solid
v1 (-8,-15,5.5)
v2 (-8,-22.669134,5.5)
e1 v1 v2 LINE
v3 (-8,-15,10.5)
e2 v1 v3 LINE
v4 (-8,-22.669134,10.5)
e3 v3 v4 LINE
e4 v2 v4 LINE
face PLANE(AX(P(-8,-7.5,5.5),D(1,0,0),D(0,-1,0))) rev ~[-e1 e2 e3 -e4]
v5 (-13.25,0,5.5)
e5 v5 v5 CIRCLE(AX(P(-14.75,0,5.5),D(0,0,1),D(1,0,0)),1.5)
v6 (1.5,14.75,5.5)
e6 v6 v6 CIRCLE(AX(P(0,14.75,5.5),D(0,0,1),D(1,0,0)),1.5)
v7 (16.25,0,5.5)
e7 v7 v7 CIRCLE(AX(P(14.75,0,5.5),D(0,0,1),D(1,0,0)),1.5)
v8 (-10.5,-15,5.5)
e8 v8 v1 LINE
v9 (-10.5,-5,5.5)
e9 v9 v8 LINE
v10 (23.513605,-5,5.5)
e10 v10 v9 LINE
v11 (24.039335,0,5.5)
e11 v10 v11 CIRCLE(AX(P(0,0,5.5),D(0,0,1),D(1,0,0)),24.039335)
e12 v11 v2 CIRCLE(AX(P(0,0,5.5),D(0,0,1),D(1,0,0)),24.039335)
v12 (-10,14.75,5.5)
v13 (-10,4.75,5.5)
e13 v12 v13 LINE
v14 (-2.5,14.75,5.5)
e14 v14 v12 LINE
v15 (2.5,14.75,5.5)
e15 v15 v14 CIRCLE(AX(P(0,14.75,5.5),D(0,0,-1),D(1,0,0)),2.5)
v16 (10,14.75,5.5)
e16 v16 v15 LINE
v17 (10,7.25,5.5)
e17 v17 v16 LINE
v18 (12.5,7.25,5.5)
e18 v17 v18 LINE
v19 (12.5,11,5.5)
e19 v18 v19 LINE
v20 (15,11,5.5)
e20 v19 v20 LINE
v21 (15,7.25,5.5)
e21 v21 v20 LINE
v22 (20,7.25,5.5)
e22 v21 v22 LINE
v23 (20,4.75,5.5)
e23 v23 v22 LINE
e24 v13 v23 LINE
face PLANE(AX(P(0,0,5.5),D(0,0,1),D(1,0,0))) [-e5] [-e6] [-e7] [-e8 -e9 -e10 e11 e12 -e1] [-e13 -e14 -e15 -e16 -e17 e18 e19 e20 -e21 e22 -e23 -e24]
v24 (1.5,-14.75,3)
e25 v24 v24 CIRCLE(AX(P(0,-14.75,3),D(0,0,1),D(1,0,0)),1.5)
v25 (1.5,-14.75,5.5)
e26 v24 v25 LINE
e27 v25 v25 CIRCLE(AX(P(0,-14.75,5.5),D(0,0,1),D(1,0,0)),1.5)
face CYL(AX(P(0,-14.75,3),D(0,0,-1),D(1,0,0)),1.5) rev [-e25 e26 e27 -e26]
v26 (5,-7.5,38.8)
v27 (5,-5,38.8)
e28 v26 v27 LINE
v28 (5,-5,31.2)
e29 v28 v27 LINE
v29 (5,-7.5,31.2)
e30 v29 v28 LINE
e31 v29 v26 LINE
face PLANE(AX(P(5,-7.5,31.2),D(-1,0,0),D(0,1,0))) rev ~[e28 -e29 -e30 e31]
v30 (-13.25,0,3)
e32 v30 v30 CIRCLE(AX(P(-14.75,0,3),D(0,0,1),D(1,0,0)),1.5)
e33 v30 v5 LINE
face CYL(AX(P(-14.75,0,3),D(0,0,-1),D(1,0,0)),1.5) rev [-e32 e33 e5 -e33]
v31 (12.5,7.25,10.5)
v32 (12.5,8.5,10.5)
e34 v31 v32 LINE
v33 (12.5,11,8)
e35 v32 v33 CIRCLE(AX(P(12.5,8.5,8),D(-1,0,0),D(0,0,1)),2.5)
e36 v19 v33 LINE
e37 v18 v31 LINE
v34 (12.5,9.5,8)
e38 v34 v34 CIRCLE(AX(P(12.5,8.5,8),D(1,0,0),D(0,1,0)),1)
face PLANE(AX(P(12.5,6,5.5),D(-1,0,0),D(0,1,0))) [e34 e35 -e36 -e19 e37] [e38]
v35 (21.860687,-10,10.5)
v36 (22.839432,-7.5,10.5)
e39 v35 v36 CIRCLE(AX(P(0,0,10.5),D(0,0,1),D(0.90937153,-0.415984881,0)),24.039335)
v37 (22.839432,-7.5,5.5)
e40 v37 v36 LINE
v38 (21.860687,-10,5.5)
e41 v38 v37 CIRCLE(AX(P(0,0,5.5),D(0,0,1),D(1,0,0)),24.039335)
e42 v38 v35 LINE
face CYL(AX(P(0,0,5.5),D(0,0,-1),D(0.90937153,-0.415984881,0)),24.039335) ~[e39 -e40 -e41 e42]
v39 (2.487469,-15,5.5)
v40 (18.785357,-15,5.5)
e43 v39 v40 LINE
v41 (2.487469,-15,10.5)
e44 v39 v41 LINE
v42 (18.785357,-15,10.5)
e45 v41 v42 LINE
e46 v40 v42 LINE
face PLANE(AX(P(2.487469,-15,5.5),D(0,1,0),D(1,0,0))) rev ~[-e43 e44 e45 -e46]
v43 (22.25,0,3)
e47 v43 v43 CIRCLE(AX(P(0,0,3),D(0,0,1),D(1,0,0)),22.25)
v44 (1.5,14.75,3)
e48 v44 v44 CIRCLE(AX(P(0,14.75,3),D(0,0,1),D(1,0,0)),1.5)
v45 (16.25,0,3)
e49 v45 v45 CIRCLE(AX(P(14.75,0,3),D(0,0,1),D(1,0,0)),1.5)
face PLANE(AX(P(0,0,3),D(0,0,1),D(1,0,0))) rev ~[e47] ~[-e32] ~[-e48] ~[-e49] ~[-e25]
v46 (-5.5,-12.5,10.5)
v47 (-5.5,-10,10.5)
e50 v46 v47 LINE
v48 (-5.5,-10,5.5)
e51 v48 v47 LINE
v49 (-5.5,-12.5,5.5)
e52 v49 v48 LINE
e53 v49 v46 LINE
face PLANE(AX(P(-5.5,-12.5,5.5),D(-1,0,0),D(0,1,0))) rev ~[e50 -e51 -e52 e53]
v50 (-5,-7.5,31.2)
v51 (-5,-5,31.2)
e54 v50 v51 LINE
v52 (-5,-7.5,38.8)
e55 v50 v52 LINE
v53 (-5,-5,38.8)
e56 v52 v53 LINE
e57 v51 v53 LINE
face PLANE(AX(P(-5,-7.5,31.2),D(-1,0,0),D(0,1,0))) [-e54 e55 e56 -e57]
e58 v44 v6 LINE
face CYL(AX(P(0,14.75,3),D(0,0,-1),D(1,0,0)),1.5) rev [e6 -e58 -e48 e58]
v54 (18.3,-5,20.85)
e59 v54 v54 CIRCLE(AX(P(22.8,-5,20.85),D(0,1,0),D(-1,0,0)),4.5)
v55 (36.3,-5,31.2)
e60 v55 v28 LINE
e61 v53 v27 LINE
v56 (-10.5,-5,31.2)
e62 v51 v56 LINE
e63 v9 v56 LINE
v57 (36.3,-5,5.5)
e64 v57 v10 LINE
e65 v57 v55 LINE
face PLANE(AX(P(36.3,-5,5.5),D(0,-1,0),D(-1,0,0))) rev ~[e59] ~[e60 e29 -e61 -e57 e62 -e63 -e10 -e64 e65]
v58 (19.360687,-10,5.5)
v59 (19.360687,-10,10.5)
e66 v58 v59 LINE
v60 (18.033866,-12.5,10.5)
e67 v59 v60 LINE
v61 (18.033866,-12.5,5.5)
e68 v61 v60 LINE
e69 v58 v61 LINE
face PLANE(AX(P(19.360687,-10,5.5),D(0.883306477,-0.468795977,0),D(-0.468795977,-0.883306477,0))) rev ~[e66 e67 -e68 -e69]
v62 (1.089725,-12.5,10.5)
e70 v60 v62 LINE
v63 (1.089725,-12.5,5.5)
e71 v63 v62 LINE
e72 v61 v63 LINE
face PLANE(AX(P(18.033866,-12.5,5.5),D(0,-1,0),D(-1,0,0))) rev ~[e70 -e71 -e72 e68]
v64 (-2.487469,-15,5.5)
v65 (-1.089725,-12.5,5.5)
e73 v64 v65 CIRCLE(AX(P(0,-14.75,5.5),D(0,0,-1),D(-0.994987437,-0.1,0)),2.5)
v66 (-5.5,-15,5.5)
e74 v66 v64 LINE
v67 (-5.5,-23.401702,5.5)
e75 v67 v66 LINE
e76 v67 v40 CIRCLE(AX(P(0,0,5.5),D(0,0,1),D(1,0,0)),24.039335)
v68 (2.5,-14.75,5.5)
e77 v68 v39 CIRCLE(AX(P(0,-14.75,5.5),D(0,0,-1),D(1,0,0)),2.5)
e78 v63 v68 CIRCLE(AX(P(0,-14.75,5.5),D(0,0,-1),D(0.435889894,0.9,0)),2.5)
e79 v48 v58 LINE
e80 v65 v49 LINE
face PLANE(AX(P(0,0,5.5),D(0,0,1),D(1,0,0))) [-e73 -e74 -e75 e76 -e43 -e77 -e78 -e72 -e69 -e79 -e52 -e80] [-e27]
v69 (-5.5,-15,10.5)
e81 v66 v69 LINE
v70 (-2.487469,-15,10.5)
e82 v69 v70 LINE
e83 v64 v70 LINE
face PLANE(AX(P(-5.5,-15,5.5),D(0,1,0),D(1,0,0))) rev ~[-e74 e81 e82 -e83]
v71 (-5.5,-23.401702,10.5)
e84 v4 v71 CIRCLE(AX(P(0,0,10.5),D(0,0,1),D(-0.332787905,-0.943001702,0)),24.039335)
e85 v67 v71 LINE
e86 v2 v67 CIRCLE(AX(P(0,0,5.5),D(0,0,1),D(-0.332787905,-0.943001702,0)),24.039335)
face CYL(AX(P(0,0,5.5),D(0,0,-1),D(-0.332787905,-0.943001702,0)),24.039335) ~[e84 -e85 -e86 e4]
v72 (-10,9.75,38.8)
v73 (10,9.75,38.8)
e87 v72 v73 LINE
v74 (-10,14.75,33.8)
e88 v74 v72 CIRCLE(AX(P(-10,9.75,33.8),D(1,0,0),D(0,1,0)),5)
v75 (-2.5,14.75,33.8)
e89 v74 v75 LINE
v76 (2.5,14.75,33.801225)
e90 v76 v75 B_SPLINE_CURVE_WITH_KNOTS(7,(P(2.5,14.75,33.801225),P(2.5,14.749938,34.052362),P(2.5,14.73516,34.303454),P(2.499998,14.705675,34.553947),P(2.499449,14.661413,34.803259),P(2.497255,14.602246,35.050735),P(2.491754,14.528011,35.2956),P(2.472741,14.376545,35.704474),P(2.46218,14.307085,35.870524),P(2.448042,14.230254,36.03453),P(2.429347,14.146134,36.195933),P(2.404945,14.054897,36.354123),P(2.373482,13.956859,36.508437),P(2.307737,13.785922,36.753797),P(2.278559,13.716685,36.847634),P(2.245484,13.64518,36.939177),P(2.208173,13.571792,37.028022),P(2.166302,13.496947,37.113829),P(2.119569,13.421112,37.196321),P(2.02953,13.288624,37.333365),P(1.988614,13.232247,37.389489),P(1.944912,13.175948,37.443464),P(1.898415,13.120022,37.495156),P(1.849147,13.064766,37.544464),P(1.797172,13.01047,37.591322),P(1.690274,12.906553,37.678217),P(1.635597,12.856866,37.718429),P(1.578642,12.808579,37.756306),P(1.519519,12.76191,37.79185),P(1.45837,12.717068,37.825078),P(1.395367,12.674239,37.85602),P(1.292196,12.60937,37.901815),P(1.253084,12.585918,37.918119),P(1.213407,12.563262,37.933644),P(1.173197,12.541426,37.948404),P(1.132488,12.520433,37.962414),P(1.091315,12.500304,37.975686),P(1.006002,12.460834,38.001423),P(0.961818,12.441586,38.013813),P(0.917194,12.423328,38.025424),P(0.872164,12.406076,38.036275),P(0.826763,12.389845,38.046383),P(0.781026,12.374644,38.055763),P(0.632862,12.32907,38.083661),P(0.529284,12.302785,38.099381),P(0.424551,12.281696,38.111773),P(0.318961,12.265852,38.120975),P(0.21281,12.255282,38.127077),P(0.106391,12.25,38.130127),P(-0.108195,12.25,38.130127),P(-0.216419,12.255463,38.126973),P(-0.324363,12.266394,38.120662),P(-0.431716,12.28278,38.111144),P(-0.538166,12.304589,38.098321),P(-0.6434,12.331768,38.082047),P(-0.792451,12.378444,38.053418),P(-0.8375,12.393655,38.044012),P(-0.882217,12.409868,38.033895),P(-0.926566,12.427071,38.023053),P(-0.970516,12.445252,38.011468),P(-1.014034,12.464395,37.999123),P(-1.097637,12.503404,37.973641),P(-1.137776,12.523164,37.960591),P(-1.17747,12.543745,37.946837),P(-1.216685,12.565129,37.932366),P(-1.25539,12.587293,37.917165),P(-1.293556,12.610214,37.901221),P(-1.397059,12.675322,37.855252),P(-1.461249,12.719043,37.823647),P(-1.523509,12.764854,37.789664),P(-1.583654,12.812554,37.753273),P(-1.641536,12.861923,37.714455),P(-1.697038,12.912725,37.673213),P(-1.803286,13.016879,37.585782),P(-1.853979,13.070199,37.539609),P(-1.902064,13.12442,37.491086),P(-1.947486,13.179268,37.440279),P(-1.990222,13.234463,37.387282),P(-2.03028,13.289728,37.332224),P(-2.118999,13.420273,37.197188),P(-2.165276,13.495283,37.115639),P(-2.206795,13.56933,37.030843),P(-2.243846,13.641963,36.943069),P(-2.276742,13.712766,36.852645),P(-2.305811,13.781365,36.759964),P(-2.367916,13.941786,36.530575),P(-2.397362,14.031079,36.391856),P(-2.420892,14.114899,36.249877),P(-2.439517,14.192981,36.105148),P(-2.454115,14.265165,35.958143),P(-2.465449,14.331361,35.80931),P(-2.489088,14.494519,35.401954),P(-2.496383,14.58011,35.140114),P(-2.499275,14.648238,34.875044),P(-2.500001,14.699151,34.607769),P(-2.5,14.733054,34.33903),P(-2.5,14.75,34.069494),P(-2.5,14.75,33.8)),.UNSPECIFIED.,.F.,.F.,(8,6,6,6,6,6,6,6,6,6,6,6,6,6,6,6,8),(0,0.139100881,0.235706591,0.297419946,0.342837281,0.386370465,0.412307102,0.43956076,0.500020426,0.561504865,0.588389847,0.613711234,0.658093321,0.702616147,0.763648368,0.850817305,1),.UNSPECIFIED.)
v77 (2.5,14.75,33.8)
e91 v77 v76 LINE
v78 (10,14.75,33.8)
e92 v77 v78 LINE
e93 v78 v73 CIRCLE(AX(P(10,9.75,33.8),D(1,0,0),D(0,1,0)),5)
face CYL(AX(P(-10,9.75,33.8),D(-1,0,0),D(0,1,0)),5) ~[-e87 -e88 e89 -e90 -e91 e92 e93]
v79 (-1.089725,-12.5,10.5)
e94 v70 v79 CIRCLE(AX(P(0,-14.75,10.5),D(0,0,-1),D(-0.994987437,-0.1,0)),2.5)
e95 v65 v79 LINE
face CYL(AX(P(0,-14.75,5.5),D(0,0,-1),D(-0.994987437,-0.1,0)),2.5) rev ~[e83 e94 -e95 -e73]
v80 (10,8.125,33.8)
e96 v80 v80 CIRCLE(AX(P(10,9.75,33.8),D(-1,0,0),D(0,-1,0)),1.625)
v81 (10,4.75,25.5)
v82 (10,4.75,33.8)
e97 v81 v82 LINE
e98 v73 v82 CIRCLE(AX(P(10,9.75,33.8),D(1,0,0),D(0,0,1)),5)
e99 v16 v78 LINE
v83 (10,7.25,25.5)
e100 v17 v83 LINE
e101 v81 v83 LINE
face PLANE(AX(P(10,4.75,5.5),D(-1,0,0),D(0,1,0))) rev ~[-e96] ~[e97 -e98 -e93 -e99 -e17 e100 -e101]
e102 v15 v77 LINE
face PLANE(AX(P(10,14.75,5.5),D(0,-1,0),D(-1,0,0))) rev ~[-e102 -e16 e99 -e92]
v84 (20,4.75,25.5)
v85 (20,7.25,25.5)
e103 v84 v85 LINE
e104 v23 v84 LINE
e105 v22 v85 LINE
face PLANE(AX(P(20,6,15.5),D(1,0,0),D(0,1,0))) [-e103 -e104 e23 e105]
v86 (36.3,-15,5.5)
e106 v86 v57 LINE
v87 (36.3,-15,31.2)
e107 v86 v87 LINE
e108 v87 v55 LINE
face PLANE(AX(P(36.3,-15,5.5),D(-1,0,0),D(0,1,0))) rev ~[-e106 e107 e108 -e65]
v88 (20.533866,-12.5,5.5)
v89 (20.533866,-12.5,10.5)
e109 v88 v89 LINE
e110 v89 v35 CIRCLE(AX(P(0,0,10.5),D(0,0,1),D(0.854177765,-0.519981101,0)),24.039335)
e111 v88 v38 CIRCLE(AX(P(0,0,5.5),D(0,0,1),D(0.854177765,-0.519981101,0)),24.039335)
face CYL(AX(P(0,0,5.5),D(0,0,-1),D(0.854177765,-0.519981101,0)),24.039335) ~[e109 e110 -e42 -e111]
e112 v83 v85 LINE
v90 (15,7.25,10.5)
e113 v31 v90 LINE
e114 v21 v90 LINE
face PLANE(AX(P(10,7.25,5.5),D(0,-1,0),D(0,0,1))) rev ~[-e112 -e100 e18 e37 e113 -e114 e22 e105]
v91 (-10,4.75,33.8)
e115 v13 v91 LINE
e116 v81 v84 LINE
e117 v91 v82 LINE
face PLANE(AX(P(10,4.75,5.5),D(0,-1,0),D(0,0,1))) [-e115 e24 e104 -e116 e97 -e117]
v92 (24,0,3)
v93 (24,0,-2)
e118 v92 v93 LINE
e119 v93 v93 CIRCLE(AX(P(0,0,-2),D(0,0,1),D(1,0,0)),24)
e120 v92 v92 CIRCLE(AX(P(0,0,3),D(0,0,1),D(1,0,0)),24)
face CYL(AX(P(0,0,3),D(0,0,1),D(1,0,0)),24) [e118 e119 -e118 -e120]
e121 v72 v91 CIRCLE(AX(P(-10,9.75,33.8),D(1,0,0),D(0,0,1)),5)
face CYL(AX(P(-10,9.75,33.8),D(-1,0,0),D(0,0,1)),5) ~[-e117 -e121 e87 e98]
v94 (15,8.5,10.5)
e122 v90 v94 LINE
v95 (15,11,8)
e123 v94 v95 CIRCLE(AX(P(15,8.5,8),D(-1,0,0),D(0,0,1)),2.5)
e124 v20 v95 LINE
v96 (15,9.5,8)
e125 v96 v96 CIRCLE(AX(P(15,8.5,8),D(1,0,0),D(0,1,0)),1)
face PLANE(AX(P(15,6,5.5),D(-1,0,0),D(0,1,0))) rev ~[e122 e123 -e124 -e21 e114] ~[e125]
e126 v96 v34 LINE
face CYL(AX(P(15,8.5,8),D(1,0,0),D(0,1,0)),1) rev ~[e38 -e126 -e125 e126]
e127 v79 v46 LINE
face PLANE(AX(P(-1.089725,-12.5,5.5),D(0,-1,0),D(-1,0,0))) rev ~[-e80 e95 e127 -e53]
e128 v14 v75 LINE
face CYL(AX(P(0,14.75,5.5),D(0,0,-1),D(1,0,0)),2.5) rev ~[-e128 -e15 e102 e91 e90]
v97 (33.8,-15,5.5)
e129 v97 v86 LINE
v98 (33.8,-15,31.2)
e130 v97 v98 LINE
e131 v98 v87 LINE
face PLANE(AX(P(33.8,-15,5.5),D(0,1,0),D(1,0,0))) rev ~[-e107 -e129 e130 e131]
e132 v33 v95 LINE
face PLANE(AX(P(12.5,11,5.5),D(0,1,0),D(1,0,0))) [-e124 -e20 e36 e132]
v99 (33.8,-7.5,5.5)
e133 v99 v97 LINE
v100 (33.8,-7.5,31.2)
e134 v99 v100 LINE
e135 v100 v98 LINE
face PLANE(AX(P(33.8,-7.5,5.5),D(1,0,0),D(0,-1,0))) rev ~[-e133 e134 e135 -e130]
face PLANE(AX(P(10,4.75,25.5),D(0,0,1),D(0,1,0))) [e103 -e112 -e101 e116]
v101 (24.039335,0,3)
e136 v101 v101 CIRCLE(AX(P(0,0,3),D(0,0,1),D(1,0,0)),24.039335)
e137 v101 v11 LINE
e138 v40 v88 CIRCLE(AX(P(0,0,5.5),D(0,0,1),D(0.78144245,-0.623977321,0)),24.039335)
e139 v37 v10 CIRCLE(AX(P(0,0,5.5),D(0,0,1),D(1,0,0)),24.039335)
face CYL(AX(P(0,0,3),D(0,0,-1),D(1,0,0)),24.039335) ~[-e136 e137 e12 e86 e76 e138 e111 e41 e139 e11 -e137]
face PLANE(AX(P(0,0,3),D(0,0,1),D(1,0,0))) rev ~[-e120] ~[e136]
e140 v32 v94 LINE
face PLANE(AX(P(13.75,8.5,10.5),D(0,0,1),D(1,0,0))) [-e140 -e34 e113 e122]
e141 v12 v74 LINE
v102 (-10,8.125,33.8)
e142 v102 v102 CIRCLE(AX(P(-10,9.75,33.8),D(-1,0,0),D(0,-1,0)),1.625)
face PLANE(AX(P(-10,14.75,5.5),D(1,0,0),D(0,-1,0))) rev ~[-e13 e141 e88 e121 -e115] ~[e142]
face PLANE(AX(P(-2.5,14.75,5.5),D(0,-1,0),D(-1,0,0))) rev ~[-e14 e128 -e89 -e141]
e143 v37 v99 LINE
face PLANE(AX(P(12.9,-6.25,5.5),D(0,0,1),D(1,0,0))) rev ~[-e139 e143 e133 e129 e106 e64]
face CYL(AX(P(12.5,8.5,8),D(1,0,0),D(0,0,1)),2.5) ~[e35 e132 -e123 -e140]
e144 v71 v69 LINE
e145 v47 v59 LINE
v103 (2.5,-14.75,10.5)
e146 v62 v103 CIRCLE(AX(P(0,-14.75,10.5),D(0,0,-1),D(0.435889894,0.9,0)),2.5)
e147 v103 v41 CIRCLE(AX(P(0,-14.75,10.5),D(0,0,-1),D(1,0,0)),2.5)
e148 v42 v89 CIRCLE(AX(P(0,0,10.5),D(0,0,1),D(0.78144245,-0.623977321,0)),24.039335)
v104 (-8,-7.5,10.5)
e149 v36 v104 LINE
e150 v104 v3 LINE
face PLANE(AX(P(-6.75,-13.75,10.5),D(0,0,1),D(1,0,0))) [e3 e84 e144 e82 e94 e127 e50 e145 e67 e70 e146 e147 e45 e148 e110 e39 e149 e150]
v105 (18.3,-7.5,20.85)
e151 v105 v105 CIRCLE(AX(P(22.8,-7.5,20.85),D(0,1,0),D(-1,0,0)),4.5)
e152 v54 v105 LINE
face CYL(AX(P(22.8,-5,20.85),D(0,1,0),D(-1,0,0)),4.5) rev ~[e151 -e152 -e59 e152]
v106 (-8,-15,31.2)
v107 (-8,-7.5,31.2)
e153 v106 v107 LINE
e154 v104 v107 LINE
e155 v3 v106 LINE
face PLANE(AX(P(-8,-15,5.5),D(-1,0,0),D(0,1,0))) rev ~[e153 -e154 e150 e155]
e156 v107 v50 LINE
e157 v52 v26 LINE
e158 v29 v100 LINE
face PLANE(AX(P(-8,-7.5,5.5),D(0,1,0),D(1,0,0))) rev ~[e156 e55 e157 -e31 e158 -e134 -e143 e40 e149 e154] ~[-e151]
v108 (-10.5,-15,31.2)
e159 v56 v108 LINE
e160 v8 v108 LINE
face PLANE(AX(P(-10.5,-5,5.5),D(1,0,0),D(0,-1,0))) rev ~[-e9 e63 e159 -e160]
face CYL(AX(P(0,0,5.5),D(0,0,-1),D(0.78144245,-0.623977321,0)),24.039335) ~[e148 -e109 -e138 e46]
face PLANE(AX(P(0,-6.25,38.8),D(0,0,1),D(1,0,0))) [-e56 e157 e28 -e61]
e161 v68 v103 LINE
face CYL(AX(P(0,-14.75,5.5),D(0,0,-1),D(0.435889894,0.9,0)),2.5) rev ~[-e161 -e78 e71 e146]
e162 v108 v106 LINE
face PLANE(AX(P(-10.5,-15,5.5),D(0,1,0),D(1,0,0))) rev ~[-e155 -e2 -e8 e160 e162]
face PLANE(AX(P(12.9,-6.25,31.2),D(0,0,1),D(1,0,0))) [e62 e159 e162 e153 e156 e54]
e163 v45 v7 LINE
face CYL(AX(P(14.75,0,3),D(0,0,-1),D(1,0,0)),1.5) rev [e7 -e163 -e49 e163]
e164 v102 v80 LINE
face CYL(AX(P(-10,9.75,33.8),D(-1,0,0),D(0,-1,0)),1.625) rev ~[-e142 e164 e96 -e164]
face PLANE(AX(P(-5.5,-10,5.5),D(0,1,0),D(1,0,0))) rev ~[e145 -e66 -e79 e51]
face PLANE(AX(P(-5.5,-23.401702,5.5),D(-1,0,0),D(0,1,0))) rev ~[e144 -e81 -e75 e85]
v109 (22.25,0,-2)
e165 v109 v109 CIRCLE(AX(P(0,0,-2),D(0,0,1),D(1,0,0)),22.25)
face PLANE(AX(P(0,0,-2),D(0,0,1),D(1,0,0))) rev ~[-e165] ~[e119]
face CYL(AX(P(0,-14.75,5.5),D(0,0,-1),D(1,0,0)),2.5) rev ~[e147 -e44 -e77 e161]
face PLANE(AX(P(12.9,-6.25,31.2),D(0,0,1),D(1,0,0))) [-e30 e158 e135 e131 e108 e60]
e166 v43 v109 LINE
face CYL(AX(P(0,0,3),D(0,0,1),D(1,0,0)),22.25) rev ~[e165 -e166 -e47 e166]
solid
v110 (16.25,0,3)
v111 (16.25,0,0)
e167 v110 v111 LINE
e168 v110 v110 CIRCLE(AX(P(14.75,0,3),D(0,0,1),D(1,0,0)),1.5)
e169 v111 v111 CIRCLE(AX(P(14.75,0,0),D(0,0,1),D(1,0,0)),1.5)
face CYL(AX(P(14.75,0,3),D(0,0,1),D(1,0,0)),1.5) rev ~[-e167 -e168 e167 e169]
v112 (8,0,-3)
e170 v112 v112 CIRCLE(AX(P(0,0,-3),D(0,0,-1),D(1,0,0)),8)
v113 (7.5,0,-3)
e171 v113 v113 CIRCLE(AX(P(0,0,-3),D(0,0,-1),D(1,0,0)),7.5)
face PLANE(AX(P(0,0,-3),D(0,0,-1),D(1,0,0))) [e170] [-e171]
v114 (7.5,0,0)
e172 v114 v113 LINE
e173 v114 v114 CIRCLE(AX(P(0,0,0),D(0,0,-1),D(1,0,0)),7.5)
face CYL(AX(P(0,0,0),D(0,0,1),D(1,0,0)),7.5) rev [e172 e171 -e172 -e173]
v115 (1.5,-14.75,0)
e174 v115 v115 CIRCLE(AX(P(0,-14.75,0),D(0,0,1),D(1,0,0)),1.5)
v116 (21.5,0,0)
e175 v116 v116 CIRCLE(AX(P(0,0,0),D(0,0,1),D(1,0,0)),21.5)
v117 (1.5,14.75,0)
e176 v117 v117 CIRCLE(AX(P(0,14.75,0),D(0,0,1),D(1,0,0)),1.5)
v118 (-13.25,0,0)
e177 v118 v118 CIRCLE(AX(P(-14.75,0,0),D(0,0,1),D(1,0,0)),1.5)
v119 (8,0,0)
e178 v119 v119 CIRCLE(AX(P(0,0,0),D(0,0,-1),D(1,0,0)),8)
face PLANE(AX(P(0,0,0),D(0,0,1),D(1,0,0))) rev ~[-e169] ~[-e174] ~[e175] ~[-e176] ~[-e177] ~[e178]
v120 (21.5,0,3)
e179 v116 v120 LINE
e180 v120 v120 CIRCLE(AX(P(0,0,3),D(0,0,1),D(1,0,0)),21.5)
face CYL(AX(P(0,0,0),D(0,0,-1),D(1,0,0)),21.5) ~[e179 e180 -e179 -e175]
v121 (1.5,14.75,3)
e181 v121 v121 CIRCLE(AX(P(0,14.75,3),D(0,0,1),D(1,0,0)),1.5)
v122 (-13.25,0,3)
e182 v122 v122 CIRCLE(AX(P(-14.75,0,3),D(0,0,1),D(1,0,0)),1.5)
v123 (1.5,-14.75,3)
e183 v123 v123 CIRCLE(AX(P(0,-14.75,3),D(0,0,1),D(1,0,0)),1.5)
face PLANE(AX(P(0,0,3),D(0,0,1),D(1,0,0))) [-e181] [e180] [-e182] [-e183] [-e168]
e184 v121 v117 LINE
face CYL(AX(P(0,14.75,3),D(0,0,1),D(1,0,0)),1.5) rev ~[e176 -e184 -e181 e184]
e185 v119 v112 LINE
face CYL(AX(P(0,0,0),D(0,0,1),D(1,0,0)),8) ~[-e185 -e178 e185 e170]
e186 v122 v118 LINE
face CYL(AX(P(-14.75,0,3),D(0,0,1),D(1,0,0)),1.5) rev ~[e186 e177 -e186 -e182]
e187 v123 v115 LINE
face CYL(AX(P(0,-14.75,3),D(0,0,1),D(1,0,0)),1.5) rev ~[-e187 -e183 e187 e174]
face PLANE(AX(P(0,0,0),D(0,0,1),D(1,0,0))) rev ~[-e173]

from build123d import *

# Parameters (mm, degrees)
F0_R      = 21.5
F1_DEPTH  = 3
F2_R      = 1.5
F3_DEPTH  = 3
F4_R      = 24
F4_R_2    = 22.25
F5_DEPTH  = 5
F7_R      = 8
F7_R_2    = 7.5
F8_DEPTH  = 3
F6_R      = 24.0393352326
F6_R_2    = 1.5
F9_DEPTH  = 2.5
F10_W     = 41.8
F10_H     = 2.5
F11_DEPTH = 25.7
F12_R     = 4.5
F13_DEPTH = 2.5
F14_W     = 2.5
F14_H     = 2.5
F15_DEPTH = 5
F17_DEPTH = 33.3
F18_R     = 1.625
F19_DEPTH = 20
F20_W     = 10
F20_H     = 2.5
F21_DEPTH = 7.6
F22_W     = 2.5
F22_H     = 5
F23_DEPTH = 5
F24_R     = 1
F25_DEPTH = 2.5
F26_W     = 2.5
F26_H     = 20
F27_DEPTH = 10
F28_R     = 2.5


with BuildPart() as f1:
    # F0 (on Top) → F1 (new body)
    with BuildSketch(Plane.XY):
        Circle(F0_R)
    extrude(amount=F1_DEPTH)

    # F2 (on face) → F3 (cut, through all)
    with BuildSketch(Plane.XY.offset(3)):
        with Locations((0, 14.75)):
            Circle(F2_R)
        with Locations((-14.75, 0)):
            Circle(F2_R)
        with Locations((14.75, 0)):
            Circle(F2_R)
        with Locations((0, -14.75)):
            Circle(F2_R)
    extrude(amount=-F3_DEPTH, mode=Mode.SUBTRACT)

    # F7 (on face) → F8 (join)
    with BuildSketch(Plane(origin=(0, 0, 0), x_dir=(1, 0, 0), z_dir=(0, 0, -1))):
        Circle(F7_R)
        Circle(F7_R_2, mode=Mode.SUBTRACT)
    extrude(amount=F8_DEPTH)


with BuildPart() as f5:
    # F4 (on face) → F5 (new body)
    with BuildSketch(Plane.XY.offset(3)):
        Circle(F4_R)
        Circle(F4_R_2, mode=Mode.SUBTRACT)
    extrude(amount=-F5_DEPTH)

    # F6 (on face) → F9 (join)
    with BuildSketch(Plane.XY.offset(3)):
        Circle(F6_R)
        with Locations((0, -14.75)):
            Circle(F6_R_2, mode=Mode.SUBTRACT)
        with Locations((-14.75, 0)):
            Circle(F6_R_2, mode=Mode.SUBTRACT)
        with Locations((14.75, 0)):
            Circle(F6_R_2, mode=Mode.SUBTRACT)
        with Locations((0, 14.75)):
            Circle(F6_R_2, mode=Mode.SUBTRACT)
    extrude(amount=F9_DEPTH)

    # F10 (on face) → F11 (join)
    with BuildSketch(Plane.XY.offset(5.5)):
        with Locations((12.9, -6.25)):
            Rectangle(F10_W, F10_H)
        Polygon((-8, -7.5), (-8, -5), (-10.5, -5), (-10.5, -15), (-8, -15), align=None)
        Polygon((36.3, -5), (33.8, -5), (33.8, -7.5), (33.8, -15), (36.3, -15), align=None)
    extrude(amount=F11_DEPTH)

    # F12 (on face) → F13 (cut, through all)
    with BuildSketch(Plane(origin=(0, -5, 0), x_dir=(-1, 0, 0), z_dir=(0, 1, 0))):
        with Locations((-22.8, 20.85)):
            Circle(F12_R)
    extrude(amount=-F13_DEPTH, mode=Mode.SUBTRACT)

    # F14 (on face) → F15 (join)
    with BuildSketch(Plane.XY.offset(5.5)):
        with Locations((-6.75, -13.75)):
            Rectangle(F14_W, F14_H)
        Polygon((-8, -7.5), (-8, -12.5), (-5.5, -12.5), (-5.5, -10), (-5.5, -7.5), align=None)
        with BuildLine():
            Line((-5.5, -7.5), (-5.5, -10))
            Line((-5.5, -10), (19.3606870529, -10))
            Line((19.3606870529, -10), (21.8606870529, -10))
            ThreePointArc((21.8606870529, -10), (22.3849872275, -8.7636741867), (22.8394316573, -7.5))
            Line((22.8394316573, -7.5), (-5.5, -7.5))
        make_face()
        with BuildLine():
            Line((21.8606870529, -10), (19.3606870529, -10))
            Line((19.3606870529, -10), (18.0338656474, -12.5))
            Line((18.0338656474, -12.5), (20.5338656474, -12.5))
            ThreePointArc((20.5338656474, -12.5), (21.2341005146, -11.2695436359), (21.8606870529, -10))
        make_face()
        with BuildLine():
            ThreePointArc((2.5, -14.75), (2.4968651828, -14.8751569376), (2.4874685928, -15))
            Line((2.4874685928, -15), (18.7853570215, -15))
            ThreePointArc((18.7853570215, -15), (19.699310085, -13.7777654431), (20.5338656474, -12.5))
            Line((20.5338656474, -12.5), (18.0338656474, -12.5))
            Line((18.0338656474, -12.5), (1.0897247359, -12.5))
            ThreePointArc((1.0897247359, -12.5), (2.1182908015, -13.4222786135), (2.5, -14.75))
        make_face()
        with BuildLine():
            Line((-5.5, -15), (-8, -15))
            Line((-8, -15), (-8, -22.6691340467))
            ThreePointArc((-8, -22.6691340467), (-6.7599307548, -23.0693080654), (-5.5, -23.4017016139))
            Line((-5.5, -23.4017016139), (-5.5, -15))
        make_face()
        with BuildLine():
            Line((-5.5, -12.5), (-5.5, -15))
            Line((-5.5, -15), (-2.4874685928, -15))
            ThreePointArc((-2.4874685928, -15), (-2.1821040369, -13.529990995), (-1.0897247359, -12.5))
            Line((-1.0897247359, -12.5), (-5.5, -12.5))
        make_face()
    extrude(amount=F15_DEPTH)

    # F16 (on face) → F17 (join)
    with BuildSketch(Plane.XY.offset(5.5)):
        with BuildLine():
            Line((-10, 14.75), (-10, 4.75))
            Line((-10, 4.75), (10, 4.75))
            Line((10, 4.75), (10, 14.75))
            Line((10, 14.75), (2.5, 14.75))
            ThreePointArc((2.5, 14.75), (0, 12.25), (-2.5, 14.75))
            Line((-2.5, 14.75), (-10, 14.75))
        make_face()
    extrude(amount=F17_DEPTH)

    # F18 (on face) → F19 (cut, through all)
    with BuildSketch(Plane(origin=(-10, 0, 0), x_dir=(0, -1, 0), z_dir=(-1, 0, 0))):
        with Locations((-9.75, 33.8)):
            Circle(F18_R)
        with BuildLine():
            ThreePointArc((-14.75, 33.8), (-13.2855339059, 37.3355339059), (-9.75, 38.8))
            Line((-9.75, 38.8), (-14.75, 38.8))
            Line((-14.75, 38.8), (-14.75, 33.8))
        make_face()
        with BuildLine():
            ThreePointArc((-9.75, 38.8), (-6.2144660941, 37.3355339059), (-4.75, 33.8))
            Line((-4.75, 33.8), (-4.75, 38.8))
            Line((-4.75, 38.8), (-9.75, 38.8))
        make_face()
    extrude(amount=-F19_DEPTH, mode=Mode.SUBTRACT)

    # F20 (on face) → F21 (join)
    with BuildSketch(Plane.XY.offset(31.2)):
        with Locations((0, -6.25)):
            Rectangle(F20_W, F20_H)
    extrude(amount=F21_DEPTH)

    # F22 (on face) → F23 (join)
    with BuildSketch(Plane.XY.offset(5.5)):
        with Locations((13.75, 8.5)):
            Rectangle(F22_W, F22_H)
    extrude(amount=F23_DEPTH)

    # F24 (on face) → F25 (cut, through all)
    with BuildSketch(Plane.YZ.offset(15)):
        with Locations((8.5, 8)):
            Circle(F24_R)
    extrude(amount=-F25_DEPTH, mode=Mode.SUBTRACT)

    # F26 (on face) → F27 (join)
    with BuildSketch(Plane.YZ.offset(10)):
        with Locations((6, 15.5)):
            Rectangle(F26_W, F26_H)
    extrude(amount=F27_DEPTH)

    # F28
    f28_edges = [f5.edges().sort_by_distance(p)[0] for p in [
        (13.75, 11, 10.5),
    ]]
    fillet(f28_edges, radius=F28_R)


solid = Compound([f1.part, f5.part])
